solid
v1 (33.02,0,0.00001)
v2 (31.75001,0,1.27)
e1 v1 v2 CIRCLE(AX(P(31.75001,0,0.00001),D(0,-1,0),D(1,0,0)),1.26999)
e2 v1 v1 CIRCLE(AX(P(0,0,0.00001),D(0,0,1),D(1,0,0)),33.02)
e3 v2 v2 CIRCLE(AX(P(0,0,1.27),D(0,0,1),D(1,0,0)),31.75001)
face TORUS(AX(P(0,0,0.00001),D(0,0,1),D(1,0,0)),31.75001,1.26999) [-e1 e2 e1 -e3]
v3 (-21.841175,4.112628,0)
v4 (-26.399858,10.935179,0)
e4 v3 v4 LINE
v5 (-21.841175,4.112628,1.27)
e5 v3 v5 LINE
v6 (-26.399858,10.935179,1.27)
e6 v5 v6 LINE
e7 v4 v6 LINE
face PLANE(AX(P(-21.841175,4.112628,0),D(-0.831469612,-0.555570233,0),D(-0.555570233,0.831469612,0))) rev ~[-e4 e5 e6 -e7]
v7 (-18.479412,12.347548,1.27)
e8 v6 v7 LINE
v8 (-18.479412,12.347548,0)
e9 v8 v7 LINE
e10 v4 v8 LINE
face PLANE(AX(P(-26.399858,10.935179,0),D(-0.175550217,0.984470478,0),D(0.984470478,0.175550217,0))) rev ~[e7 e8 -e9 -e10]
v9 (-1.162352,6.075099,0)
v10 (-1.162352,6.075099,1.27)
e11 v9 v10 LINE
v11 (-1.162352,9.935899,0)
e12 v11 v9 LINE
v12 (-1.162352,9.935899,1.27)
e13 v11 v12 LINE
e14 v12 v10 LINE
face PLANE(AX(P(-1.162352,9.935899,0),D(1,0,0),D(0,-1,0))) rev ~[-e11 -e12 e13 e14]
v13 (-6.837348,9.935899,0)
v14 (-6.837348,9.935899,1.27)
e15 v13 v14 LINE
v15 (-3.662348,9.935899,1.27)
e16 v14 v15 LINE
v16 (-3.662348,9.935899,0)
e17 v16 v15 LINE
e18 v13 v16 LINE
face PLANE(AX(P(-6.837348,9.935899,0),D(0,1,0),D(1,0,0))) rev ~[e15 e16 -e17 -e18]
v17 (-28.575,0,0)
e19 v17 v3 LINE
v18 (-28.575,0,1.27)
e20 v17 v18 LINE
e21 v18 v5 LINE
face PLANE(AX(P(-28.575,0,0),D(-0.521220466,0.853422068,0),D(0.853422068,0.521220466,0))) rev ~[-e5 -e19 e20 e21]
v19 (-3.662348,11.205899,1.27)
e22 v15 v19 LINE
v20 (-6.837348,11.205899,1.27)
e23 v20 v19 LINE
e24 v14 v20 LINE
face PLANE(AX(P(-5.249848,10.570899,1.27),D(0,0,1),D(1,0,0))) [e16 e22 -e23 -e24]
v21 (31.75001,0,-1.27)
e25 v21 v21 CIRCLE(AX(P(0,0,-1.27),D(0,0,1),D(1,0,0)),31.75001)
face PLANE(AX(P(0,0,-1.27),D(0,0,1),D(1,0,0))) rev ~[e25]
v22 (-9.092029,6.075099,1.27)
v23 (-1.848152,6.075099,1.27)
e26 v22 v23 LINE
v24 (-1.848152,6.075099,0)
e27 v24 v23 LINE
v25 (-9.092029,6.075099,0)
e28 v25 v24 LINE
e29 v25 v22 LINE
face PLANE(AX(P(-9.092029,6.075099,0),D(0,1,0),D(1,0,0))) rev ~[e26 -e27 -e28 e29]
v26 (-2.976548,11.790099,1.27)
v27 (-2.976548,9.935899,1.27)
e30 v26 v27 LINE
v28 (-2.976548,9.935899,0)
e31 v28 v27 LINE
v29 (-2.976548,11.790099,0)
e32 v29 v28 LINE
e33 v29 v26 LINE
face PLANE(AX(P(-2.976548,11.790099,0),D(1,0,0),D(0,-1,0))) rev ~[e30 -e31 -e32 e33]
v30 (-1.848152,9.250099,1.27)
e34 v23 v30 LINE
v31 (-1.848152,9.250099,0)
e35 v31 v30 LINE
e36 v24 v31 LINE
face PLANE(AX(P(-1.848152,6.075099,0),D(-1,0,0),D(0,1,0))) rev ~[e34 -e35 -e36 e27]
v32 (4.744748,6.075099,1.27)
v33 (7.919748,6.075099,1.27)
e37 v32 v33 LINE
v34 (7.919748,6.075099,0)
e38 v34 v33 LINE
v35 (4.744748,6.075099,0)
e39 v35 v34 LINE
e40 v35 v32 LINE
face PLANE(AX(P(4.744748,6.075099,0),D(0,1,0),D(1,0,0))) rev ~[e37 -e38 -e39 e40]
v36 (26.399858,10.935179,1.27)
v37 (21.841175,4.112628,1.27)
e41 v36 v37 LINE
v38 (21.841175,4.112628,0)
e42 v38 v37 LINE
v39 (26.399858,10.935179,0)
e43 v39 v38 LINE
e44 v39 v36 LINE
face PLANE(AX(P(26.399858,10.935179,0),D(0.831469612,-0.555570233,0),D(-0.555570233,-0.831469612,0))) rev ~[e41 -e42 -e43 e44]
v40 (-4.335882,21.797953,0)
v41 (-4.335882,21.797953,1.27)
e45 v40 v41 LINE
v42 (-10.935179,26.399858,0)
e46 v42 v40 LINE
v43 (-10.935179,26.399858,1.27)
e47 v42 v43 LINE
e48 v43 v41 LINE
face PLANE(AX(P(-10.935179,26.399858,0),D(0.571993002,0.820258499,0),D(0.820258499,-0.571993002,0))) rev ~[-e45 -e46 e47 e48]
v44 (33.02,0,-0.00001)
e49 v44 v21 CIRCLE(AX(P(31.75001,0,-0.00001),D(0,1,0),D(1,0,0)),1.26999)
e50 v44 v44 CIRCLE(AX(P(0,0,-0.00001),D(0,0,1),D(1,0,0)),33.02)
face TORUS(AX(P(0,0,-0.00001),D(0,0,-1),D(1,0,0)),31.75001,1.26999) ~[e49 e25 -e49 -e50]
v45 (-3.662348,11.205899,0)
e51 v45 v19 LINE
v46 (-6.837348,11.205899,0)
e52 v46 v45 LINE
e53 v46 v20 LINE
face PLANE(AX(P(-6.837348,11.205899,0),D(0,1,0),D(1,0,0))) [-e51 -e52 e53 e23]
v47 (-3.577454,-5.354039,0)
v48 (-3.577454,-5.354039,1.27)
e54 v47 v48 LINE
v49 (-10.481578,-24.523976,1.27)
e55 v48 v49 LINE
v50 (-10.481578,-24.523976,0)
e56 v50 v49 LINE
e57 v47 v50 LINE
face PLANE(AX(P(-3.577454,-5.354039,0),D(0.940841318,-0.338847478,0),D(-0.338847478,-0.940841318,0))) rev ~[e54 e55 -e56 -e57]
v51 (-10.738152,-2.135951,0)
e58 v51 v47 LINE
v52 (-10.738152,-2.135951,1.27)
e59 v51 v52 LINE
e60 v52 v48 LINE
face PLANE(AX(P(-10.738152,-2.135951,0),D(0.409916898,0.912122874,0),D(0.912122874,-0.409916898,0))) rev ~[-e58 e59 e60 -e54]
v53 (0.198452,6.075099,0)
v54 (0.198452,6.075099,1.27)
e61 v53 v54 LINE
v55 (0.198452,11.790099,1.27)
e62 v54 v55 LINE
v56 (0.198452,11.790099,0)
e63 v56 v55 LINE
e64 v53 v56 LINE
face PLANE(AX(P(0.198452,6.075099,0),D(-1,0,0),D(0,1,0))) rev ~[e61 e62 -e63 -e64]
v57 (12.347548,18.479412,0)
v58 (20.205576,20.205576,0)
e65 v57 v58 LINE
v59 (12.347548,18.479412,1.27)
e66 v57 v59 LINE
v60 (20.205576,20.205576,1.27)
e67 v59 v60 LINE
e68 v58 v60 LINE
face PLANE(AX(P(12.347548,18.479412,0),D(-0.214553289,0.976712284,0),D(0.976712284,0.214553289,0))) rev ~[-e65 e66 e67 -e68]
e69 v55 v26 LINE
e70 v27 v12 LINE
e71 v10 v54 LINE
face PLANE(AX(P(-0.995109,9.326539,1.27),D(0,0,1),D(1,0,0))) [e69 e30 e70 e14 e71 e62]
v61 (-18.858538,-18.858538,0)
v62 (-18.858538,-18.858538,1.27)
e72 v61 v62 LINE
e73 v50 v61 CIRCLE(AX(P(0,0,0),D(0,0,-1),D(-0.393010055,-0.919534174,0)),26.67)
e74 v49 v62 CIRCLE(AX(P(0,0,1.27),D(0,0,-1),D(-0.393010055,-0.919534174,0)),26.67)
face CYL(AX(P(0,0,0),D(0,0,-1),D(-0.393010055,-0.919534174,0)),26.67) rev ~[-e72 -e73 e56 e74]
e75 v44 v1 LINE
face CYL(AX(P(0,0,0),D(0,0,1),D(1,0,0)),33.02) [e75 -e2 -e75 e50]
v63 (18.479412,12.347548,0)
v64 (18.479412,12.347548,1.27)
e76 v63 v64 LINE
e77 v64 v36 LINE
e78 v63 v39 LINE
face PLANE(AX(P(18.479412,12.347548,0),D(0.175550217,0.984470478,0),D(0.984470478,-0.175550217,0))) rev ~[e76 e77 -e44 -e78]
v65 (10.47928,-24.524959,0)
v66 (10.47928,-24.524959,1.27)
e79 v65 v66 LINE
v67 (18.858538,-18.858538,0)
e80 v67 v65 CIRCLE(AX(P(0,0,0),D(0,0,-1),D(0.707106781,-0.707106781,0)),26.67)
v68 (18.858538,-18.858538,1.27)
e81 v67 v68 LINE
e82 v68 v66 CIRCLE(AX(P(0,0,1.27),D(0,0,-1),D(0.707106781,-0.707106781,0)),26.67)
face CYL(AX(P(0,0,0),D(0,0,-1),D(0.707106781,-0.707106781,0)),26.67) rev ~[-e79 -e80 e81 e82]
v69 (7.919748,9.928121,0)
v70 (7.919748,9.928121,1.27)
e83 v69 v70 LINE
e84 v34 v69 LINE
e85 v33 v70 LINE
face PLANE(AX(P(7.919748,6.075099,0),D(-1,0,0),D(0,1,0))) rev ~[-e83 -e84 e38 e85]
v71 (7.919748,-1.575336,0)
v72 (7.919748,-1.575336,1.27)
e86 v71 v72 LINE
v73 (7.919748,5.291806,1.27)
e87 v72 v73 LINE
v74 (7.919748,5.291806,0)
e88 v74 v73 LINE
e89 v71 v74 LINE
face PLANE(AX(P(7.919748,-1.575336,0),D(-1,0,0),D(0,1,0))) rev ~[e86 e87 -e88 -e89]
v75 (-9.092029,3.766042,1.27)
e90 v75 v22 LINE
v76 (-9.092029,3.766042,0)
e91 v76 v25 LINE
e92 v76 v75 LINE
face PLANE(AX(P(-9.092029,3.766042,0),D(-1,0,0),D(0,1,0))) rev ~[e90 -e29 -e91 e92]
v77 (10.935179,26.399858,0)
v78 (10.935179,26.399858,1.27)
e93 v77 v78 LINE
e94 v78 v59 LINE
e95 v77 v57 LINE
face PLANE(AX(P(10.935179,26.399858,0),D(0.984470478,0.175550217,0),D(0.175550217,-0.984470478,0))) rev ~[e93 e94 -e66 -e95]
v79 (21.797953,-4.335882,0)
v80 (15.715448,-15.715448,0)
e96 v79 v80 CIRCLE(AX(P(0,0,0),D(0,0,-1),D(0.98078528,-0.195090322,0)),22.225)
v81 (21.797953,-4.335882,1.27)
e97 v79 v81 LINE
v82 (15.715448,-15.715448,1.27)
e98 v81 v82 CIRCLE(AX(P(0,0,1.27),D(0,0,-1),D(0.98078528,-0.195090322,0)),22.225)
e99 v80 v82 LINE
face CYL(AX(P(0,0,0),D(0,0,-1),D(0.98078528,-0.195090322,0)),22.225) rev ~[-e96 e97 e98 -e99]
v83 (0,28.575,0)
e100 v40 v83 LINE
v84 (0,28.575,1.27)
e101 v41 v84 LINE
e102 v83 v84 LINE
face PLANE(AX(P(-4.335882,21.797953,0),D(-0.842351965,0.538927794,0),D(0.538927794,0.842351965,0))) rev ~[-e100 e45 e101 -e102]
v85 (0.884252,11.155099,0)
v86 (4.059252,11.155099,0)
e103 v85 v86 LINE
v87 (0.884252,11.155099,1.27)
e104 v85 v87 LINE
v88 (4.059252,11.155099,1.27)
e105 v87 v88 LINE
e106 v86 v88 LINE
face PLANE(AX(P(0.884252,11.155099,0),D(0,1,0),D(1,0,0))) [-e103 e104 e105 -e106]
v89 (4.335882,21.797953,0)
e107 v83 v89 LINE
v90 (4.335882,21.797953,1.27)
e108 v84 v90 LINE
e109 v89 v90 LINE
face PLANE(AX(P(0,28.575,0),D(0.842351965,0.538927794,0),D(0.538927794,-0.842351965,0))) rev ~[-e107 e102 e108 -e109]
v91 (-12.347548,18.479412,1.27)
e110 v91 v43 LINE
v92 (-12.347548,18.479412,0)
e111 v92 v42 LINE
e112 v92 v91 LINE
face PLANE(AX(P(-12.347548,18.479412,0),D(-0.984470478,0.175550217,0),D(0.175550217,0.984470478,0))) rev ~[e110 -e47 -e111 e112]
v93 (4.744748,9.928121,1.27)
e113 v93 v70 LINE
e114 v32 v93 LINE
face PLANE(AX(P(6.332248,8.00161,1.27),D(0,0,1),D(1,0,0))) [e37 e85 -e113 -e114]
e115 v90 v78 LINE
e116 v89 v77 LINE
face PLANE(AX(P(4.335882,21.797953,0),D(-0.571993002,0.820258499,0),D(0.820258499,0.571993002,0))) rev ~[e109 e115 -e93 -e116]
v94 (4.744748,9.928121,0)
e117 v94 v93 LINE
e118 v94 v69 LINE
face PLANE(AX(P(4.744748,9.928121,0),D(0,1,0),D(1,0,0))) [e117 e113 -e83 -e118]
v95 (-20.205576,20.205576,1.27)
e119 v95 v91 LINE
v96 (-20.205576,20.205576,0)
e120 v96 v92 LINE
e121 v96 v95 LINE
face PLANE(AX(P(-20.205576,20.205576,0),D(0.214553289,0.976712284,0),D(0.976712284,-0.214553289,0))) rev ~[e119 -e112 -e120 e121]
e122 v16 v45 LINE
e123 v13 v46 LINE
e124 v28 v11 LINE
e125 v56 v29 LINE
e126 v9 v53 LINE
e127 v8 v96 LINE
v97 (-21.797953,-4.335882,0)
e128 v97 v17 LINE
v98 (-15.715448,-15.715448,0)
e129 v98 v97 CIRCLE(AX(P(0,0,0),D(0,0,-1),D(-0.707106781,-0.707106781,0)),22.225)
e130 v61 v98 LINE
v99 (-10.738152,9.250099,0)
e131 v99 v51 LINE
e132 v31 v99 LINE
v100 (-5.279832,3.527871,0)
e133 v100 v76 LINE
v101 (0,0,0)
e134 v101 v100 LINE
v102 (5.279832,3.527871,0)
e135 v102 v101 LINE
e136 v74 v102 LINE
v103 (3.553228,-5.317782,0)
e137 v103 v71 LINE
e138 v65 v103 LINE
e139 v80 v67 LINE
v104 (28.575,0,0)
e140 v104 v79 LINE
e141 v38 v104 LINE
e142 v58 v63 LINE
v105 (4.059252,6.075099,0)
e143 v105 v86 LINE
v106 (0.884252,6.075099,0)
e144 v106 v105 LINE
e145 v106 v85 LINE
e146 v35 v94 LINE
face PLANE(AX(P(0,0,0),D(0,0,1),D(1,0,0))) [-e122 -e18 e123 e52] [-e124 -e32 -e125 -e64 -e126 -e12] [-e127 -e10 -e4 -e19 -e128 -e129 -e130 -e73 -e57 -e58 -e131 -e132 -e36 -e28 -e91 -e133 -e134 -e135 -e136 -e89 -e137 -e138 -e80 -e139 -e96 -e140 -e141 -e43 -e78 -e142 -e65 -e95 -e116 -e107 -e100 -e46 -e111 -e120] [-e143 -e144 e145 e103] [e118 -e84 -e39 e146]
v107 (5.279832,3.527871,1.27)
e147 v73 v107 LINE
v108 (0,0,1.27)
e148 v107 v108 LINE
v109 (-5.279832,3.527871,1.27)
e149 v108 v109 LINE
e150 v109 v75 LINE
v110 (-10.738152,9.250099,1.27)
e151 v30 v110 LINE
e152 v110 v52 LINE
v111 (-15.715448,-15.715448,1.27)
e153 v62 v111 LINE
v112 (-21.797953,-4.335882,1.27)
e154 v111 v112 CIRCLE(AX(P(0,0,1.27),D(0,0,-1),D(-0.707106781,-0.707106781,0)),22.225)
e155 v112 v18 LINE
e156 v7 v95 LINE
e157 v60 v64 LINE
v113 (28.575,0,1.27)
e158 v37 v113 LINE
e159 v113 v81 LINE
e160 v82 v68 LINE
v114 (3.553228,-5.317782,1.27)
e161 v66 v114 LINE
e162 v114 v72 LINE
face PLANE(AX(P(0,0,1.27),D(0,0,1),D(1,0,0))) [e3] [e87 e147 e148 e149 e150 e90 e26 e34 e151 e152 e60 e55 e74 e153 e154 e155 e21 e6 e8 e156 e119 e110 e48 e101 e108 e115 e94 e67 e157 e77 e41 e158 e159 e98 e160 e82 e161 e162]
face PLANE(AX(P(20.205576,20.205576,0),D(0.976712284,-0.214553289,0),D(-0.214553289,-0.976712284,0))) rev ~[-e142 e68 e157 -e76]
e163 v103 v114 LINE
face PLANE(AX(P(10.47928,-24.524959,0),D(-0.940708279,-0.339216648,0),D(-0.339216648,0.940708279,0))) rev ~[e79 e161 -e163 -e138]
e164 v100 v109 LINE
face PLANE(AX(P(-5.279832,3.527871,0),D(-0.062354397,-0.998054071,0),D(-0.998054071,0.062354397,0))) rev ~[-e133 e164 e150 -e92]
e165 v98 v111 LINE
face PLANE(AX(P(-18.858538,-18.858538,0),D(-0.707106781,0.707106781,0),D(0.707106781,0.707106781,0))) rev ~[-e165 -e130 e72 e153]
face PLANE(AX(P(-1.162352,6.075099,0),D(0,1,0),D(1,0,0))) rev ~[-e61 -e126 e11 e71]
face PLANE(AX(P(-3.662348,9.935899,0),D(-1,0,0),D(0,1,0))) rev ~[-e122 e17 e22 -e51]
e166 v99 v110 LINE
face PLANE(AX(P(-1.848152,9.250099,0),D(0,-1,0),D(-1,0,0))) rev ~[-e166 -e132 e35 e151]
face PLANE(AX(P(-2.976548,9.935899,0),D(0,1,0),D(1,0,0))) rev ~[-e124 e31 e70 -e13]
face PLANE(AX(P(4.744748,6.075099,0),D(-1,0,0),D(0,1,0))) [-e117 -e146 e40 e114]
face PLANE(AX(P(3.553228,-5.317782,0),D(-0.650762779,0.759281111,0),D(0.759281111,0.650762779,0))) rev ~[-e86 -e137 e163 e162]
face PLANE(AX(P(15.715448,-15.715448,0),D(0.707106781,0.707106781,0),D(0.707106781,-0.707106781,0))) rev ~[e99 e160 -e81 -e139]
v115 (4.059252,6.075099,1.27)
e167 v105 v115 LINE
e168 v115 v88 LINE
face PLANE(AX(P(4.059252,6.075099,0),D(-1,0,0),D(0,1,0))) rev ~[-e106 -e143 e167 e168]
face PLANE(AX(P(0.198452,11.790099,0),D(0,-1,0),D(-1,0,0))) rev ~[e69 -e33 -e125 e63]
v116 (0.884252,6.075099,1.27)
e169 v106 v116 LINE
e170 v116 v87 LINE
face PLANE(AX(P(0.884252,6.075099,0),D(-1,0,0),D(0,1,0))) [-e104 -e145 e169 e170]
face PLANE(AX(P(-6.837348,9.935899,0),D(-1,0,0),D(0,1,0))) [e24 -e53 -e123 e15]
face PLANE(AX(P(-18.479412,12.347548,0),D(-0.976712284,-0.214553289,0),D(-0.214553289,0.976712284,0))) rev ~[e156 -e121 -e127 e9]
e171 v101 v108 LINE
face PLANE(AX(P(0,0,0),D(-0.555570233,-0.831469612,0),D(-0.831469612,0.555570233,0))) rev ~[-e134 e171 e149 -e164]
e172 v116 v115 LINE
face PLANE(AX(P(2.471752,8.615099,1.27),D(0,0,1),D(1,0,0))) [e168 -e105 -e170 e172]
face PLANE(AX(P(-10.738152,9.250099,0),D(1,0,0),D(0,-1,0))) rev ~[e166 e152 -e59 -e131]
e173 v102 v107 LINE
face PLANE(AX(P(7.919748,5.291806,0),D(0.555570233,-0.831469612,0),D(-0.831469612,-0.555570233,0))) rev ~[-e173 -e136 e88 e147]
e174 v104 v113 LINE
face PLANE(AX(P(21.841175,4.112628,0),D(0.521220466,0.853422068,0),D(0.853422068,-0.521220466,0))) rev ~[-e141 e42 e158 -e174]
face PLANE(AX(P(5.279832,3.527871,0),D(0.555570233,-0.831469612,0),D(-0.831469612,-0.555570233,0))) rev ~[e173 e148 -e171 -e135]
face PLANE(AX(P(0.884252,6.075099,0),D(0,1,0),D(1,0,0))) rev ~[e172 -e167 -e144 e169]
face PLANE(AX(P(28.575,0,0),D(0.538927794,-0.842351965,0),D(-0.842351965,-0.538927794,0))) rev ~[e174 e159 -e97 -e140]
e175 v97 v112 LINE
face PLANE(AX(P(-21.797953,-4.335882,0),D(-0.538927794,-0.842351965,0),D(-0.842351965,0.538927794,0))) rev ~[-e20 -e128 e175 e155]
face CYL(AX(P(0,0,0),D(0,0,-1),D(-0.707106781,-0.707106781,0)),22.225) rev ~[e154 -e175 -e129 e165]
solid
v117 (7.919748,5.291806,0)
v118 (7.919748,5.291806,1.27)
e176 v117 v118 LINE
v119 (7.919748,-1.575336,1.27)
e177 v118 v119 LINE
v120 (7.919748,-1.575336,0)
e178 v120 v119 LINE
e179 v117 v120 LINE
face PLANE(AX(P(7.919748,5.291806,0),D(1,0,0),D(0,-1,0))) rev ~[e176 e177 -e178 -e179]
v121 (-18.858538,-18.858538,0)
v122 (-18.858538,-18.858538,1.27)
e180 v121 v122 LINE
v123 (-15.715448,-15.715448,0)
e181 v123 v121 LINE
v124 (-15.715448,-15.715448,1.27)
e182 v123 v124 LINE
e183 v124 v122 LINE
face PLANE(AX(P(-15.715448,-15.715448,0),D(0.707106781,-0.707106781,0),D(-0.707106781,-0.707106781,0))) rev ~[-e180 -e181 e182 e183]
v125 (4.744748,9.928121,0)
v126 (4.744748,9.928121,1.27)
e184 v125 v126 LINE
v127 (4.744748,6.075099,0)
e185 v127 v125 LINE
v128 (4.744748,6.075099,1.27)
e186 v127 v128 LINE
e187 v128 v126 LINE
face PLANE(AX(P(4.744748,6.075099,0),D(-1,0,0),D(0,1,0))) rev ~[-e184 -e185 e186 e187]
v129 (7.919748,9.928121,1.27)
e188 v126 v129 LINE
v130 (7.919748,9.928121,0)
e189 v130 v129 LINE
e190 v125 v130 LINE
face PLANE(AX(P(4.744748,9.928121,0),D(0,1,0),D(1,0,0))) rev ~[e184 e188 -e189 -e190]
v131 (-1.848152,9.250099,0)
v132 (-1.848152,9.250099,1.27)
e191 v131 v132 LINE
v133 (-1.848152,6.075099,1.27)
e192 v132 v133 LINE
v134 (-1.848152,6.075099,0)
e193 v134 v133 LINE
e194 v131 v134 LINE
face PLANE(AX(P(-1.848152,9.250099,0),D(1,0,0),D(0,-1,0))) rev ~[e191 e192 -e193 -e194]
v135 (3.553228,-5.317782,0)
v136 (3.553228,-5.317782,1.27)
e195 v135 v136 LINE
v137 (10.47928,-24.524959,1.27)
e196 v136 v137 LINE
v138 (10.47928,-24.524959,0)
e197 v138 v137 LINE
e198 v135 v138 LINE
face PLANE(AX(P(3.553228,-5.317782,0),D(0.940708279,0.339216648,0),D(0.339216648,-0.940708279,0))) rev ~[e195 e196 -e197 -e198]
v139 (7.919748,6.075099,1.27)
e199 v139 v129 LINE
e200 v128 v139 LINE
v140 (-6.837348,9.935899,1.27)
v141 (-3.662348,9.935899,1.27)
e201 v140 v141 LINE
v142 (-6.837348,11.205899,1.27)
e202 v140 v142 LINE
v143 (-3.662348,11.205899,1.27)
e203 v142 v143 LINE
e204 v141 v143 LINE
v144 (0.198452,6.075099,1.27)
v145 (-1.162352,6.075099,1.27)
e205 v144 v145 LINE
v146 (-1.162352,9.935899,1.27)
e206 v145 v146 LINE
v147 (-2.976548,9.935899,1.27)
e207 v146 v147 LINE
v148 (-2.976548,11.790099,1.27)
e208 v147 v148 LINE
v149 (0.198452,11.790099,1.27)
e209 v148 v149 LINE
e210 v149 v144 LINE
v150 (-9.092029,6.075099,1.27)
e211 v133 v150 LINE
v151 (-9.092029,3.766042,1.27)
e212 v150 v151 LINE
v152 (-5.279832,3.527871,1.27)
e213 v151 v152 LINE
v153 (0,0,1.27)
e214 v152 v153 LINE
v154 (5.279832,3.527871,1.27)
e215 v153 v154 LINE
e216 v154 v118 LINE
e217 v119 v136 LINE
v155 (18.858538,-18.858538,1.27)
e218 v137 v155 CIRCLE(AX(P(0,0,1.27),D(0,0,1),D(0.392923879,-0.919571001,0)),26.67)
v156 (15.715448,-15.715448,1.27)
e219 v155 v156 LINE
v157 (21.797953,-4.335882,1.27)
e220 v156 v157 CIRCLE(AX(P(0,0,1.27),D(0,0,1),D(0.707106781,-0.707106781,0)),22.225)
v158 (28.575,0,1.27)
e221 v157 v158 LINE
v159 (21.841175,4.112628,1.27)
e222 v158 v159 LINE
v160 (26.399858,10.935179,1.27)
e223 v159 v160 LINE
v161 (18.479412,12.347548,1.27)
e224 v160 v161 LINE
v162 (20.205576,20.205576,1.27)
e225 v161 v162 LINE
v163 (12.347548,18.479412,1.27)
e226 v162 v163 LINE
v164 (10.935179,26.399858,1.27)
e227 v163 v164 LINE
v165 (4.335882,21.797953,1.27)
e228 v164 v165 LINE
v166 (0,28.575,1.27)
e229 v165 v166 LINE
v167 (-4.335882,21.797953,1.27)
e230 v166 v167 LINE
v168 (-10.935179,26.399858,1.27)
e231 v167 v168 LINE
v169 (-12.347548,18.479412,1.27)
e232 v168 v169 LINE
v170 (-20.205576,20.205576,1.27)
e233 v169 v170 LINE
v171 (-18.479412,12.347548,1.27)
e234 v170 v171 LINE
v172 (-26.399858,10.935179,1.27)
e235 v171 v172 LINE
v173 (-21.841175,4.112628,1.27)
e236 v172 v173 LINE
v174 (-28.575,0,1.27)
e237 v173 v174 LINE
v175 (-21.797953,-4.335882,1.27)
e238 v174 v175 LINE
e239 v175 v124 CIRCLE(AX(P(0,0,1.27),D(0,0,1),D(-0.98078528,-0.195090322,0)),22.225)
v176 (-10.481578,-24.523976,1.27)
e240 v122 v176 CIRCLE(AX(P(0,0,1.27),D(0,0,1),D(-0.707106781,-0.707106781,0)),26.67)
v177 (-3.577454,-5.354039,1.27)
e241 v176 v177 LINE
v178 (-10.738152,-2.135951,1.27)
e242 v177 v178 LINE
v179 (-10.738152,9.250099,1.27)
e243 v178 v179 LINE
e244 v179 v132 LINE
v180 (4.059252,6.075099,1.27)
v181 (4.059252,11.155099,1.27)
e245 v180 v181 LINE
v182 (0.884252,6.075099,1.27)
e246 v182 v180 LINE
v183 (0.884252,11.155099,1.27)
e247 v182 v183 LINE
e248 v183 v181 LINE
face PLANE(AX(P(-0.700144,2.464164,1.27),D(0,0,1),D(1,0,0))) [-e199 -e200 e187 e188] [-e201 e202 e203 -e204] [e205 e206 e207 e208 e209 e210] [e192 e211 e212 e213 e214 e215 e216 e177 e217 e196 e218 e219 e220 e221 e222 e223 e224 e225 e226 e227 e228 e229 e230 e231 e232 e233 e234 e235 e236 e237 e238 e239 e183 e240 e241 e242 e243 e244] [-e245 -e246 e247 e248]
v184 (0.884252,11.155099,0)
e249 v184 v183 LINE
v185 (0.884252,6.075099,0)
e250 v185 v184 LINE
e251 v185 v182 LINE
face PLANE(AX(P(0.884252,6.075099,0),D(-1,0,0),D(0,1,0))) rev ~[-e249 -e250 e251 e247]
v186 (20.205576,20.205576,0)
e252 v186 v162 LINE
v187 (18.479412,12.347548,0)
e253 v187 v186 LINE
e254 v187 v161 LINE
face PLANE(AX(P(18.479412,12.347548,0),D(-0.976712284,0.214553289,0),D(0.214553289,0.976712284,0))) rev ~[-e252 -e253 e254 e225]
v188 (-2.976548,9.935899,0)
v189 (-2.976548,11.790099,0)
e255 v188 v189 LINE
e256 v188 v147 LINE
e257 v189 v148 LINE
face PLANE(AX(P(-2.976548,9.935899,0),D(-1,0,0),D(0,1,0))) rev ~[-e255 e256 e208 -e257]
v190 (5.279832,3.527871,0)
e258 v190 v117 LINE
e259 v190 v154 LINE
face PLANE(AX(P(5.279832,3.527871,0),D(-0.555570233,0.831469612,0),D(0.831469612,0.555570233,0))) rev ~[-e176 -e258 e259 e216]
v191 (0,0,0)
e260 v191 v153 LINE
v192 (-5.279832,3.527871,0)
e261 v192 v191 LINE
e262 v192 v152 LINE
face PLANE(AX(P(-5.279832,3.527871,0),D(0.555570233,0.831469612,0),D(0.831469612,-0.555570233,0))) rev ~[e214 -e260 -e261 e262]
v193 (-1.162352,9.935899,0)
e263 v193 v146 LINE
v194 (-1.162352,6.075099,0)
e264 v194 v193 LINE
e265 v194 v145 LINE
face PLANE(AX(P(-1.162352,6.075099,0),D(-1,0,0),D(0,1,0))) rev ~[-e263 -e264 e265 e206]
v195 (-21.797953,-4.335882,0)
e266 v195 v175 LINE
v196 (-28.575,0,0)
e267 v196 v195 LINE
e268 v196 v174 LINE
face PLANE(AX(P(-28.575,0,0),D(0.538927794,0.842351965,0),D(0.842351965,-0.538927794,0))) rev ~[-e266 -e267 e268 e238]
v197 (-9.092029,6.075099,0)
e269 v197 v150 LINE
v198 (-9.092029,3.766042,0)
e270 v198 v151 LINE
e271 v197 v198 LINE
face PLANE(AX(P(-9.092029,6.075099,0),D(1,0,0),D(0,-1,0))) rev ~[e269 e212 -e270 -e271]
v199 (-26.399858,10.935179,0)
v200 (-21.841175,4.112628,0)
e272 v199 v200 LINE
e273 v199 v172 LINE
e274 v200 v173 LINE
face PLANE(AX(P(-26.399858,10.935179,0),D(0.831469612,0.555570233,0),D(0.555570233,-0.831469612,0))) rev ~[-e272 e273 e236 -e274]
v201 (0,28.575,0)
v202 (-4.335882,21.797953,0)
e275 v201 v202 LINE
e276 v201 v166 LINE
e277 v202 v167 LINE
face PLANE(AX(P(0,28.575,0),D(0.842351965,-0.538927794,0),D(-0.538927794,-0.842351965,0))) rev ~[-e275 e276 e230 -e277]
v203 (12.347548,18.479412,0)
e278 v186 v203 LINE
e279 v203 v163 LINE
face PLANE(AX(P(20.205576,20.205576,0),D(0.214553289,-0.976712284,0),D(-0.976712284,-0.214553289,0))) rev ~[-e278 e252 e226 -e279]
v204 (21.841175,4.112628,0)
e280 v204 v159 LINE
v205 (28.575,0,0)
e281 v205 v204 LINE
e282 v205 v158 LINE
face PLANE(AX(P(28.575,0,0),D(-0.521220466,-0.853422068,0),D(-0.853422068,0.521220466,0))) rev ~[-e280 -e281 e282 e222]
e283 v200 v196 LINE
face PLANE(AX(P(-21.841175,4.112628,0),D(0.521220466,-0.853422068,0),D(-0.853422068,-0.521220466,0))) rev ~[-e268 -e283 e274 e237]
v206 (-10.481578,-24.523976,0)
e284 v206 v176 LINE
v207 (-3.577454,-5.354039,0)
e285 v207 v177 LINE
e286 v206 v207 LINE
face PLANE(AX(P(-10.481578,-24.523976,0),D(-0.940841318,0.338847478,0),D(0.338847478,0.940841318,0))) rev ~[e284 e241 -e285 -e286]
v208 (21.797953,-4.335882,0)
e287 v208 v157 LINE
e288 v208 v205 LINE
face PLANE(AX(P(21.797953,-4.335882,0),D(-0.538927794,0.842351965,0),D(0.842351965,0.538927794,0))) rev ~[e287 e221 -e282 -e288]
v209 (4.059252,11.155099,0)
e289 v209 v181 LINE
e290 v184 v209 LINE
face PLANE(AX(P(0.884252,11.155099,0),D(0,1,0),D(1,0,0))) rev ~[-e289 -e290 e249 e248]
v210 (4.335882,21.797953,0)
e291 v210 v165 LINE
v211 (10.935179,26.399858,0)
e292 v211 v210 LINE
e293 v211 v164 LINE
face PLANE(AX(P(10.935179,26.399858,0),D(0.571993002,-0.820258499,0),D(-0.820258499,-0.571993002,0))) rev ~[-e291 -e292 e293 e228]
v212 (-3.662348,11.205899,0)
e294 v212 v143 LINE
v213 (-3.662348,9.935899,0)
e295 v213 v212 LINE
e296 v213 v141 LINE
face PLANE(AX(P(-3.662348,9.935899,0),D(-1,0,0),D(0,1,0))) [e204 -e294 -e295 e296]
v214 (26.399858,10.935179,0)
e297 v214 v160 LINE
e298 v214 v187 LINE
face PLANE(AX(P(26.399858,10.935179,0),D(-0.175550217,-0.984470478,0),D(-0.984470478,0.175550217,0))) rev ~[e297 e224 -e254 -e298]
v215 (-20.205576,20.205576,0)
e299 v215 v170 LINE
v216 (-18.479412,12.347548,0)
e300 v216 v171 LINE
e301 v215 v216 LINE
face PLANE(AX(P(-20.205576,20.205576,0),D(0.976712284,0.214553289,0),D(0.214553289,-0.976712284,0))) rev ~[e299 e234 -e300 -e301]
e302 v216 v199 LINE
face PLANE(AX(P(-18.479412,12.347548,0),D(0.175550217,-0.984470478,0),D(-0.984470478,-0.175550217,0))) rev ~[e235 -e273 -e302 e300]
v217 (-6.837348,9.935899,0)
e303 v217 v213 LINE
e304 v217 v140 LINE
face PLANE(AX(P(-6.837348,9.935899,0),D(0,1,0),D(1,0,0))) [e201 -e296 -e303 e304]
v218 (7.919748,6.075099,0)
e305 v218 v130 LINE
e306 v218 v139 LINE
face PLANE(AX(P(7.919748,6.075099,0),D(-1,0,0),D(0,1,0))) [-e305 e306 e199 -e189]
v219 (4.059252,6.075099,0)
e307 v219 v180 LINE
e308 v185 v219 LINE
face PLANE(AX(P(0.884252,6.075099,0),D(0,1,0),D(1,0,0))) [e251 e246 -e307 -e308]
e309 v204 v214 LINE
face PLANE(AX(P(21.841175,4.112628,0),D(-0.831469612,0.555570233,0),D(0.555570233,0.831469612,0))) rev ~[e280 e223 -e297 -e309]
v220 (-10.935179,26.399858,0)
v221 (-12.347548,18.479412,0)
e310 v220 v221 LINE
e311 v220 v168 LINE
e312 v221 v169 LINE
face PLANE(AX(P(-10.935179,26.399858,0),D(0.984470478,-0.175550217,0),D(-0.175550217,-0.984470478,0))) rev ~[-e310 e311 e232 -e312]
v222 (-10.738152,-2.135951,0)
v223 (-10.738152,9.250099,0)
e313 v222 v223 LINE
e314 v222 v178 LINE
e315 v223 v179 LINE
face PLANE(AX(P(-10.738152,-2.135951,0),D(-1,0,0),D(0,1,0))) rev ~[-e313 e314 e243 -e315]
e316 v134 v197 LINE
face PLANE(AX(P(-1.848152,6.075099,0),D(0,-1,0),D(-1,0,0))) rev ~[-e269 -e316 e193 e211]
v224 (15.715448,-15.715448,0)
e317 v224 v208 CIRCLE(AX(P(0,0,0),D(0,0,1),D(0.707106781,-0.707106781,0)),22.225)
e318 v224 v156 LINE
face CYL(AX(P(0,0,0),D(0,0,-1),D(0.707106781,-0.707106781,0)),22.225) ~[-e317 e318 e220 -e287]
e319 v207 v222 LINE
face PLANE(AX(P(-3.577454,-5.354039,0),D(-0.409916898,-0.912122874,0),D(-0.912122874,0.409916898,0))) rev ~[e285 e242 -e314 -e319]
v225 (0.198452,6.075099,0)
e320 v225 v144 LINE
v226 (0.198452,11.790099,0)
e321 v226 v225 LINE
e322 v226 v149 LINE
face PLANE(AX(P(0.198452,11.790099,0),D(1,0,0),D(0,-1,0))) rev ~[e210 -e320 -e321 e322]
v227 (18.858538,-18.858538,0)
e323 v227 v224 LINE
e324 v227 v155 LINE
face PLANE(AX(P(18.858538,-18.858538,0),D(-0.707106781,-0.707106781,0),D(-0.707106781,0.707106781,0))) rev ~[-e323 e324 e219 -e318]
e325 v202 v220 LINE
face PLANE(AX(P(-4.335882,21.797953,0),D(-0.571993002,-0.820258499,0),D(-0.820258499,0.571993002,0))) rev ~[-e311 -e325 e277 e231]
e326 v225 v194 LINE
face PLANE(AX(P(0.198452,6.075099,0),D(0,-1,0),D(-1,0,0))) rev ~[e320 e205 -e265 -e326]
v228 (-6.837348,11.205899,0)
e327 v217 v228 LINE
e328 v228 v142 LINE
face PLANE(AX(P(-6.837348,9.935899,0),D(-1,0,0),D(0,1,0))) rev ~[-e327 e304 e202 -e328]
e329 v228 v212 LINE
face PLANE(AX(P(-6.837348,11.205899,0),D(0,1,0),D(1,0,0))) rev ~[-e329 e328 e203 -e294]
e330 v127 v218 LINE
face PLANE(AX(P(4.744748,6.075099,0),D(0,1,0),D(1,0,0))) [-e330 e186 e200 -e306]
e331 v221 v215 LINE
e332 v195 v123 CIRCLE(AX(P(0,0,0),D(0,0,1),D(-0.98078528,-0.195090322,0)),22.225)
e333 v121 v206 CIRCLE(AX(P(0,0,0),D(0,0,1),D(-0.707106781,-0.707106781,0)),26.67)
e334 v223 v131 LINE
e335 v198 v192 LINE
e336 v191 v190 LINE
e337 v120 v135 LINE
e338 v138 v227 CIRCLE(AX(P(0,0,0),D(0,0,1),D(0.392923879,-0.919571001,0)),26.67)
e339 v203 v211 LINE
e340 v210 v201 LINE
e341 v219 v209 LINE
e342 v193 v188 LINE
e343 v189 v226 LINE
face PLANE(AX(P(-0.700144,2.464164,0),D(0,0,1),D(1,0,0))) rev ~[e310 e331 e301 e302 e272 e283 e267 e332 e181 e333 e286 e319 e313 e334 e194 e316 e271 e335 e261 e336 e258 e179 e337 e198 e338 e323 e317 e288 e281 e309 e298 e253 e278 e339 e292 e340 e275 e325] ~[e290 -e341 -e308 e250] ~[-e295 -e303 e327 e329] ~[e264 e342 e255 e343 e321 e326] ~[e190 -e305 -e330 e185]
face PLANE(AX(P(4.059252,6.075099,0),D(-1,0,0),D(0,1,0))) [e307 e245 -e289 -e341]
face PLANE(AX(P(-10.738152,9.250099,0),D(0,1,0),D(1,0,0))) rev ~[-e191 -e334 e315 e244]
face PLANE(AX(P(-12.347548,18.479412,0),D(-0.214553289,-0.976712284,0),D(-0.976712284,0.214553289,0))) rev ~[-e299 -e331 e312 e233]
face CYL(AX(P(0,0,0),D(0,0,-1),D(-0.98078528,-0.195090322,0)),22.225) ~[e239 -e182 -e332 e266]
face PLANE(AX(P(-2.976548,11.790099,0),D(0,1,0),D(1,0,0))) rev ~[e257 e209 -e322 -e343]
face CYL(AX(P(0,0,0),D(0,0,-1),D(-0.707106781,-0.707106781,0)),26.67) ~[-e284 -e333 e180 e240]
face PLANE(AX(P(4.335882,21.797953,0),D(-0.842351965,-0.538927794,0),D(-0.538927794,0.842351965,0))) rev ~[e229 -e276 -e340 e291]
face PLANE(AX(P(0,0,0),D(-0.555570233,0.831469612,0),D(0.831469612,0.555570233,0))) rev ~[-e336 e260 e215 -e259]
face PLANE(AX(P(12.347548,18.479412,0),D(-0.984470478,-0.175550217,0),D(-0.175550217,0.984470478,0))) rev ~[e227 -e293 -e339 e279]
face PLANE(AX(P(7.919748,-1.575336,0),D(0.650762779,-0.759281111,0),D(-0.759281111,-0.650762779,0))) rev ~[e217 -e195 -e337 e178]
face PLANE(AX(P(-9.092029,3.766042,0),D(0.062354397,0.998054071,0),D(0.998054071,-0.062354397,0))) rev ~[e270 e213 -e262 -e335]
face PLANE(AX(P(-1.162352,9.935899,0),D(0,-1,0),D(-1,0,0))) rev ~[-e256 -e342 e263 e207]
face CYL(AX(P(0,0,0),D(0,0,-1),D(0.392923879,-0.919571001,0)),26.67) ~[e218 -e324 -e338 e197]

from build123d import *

# Parameters (mm, degrees)
F0_R     = 33.02
F1_DEPTH = 1.27
F0_W     = 3.175
F0_H     = 3.8530217187
F0_H_2   = 5.08
F0_H_3   = 1.27
F2_DEPTH = 1.27
F3_DEPTH = 1.27
F4_R     = 1.26999


# Not quite as in the source:
# - a fillet or chamfer is up to 0.001 mm smaller than in the source, because OpenCascade refuses the exact size


with BuildPart() as f1:
    # F0 (on Top) → F1 (new body)
    with BuildSketch(Plane.XY):
        Circle(F0_R)
        with BuildLine():
            Line((-2.9765482984, 6.0750994888), (-1.8481521045, 6.0750994888))
            Line((-1.8481521045, 6.0750994888), (-1.8481521045, 9.2500994888))
            Line((-1.8481521045, 9.2500994888), (-10.7381521045, 9.2500994888))
            Line((-10.7381521045, 9.2500994888), (-10.7381521045, 2.1359512564))
            Line((-10.7381521045, 2.1359512564), (-10.7381521045, 0))
            Line((-10.7381521045, 0), (-10.7381521045, -2.1359512564))
            Line((-10.7381521045, -2.1359512564), (-3.5774542134, -5.3540385915))
            Line((-3.5774542134, -5.3540385915), (-10.4815781743, -24.5239764104))
            ThreePointArc((-10.4815781743, -24.5239764104), (-14.9410475085, -22.0919442184), (-18.8585378542, -18.8585378542))
            Line((-18.8585378542, -18.8585378542), (-15.7154482119, -15.7154482119))
            ThreePointArc((-15.7154482119, -15.7154482119), (-19.6007001001, -10.476792476), (-21.797952857, -4.3358824068))
            Line((-21.797952857, -4.3358824068), (-28.575, 0))
            Line((-28.575, 0), (-21.8411747772, 4.1126280349))
            Line((-21.8411747772, 4.1126280349), (-26.3998576415, 10.9351790798))
            Line((-26.3998576415, 10.9351790798), (-18.4794121334, 12.3475484289))
            Line((-18.4794121334, 12.3475484289), (-20.2055762724, 20.2055762724))
            Line((-20.2055762724, 20.2055762724), (-12.3475484289, 18.4794121334))
            Line((-12.3475484289, 18.4794121334), (-10.9351790798, 26.3998576415))
            Line((-10.9351790798, 26.3998576415), (-4.3358824068, 21.797952857))
            Line((-4.3358824068, 21.797952857), (0, 28.575))
            Line((0, 28.575), (4.3358824068, 21.797952857))
            Line((4.3358824068, 21.797952857), (10.9351790798, 26.3998576415))
            Line((10.9351790798, 26.3998576415), (12.3475484289, 18.4794121334))
            Line((12.3475484289, 18.4794121334), (20.2055762724, 20.2055762724))
            Line((20.2055762724, 20.2055762724), (18.4794121334, 12.3475484289))
            Line((18.4794121334, 12.3475484289), (26.3998576415, 10.9351790798))
            Line((26.3998576415, 10.9351790798), (21.8411747772, 4.1126280349))
            Line((21.8411747772, 4.1126280349), (28.575, 0))
            Line((28.575, 0), (21.797952857, -4.3358824068))
            ThreePointArc((21.797952857, -4.3358824068), (19.6007001001, -10.476792476), (15.7154482119, -15.7154482119))
            Line((15.7154482119, -15.7154482119), (18.8585378542, -18.8585378542))
            ThreePointArc((18.8585378542, -18.8585378542), (14.9400123163, -22.092644296), (10.4792798584, -24.5249585861))
            Line((10.4792798584, -24.5249585861), (3.5532282388, -5.3177818583))
            Line((3.5532282388, -5.3177818583), (7.9197480572, -1.5753358351))
            Line((7.9197480572, -1.5753358351), (7.9197480572, 0))
            Line((7.9197480572, 0), (7.9197480572, 1.5753358351))
            Line((7.9197480572, 1.5753358351), (7.9197480572, 5.2918064695))
            Line((7.9197480572, 5.2918064695), (5.2798320381, 3.5278709797))
            Line((5.2798320381, 3.5278709797), (0, 0))
            Line((0, 0), (-5.2798320381, 3.5278709797))
            Line((-5.2798320381, 3.5278709797), (-9.0920289037, 3.7660416814))
            Line((-9.0920289037, 3.7660416814), (-9.0920289037, 6.0750994888))
            Line((-9.0920289037, 6.0750994888), (-3.6623482984, 6.0750994888))
            Line((-3.6623482984, 6.0750994888), (-2.9765482984, 6.0750994888))
        make_face(mode=Mode.SUBTRACT)
    extrude(amount=F1_DEPTH)



with BuildPart() as f1b:
    # F0 (on Top) → F1, piece 2 (new body)
    with BuildSketch(Plane.XY):
        with Locations((6.3322480572, 8.0016103481)):
            Rectangle(F0_W, F0_H)
    extrude(amount=F1_DEPTH)


with BuildPart() as f1c:
    # F0 (on Top) → F1, piece 3 (new body)
    with BuildSketch(Plane.XY):
        with Locations((2.4717517016, 8.6150994888)):
            Rectangle(F0_W, F0_H_2)
    extrude(amount=F1_DEPTH)


with BuildPart() as f1d:
    # F0 (on Top) → F1, piece 4 (new body)
    with BuildSketch(Plane.XY):
        Polygon((-1.1623521045, 6.0750994888), (0.1984517016, 6.0750994888), (0.1984517016, 11.7900994888), (-2.9765482984, 11.7900994888), (-2.9765482984, 9.9358994888), (-1.1623521045, 9.9358994888), align=None)
    extrude(amount=F1_DEPTH)


with BuildPart() as f1e:
    # F0 (on Top) → F1, piece 5 (new body)
    with BuildSketch(Plane.XY):
        with Locations((-5.2498482984, 10.5708994888)):
            Rectangle(F0_W, F0_H_3)
    extrude(amount=F1_DEPTH)


with BuildPart() as f2:
    # F0 (on Top) → F2 (new body)
    with BuildSketch(Plane.XY):
        with BuildLine():
            Line((-1.8481521045, 9.2500994888), (-1.8481521045, 6.0750994888))
            Line((-1.8481521045, 6.0750994888), (-2.9765482984, 6.0750994888))
            Line((-2.9765482984, 6.0750994888), (-3.6623482984, 6.0750994888))
            Line((-3.6623482984, 6.0750994888), (-9.0920289037, 6.0750994888))
            Line((-9.0920289037, 6.0750994888), (-9.0920289037, 3.7660416814))
            Line((-9.0920289037, 3.7660416814), (-5.2798320381, 3.5278709797))
            Line((-5.2798320381, 3.5278709797), (0, 0))
            Line((0, 0), (5.2798320381, 3.5278709797))
            Line((5.2798320381, 3.5278709797), (7.9197480572, 5.2918064695))
            Line((7.9197480572, 5.2918064695), (7.9197480572, 1.5753358351))
            Line((7.9197480572, 1.5753358351), (7.9197480572, 0))
            Line((7.9197480572, 0), (7.9197480572, -1.5753358351))
            Line((7.9197480572, -1.5753358351), (3.5532282388, -5.3177818583))
            Line((3.5532282388, -5.3177818583), (10.4792798584, -24.5249585861))
            ThreePointArc((10.4792798584, -24.5249585861), (14.9400123163, -22.092644296), (18.8585378542, -18.8585378542))
            Line((18.8585378542, -18.8585378542), (15.7154482119, -15.7154482119))
            ThreePointArc((15.7154482119, -15.7154482119), (19.6007001001, -10.476792476), (21.797952857, -4.3358824068))
            Line((21.797952857, -4.3358824068), (28.575, 0))
            Line((28.575, 0), (21.8411747772, 4.1126280349))
            Line((21.8411747772, 4.1126280349), (26.3998576415, 10.9351790798))
            Line((26.3998576415, 10.9351790798), (18.4794121334, 12.3475484289))
            Line((18.4794121334, 12.3475484289), (20.2055762724, 20.2055762724))
            Line((20.2055762724, 20.2055762724), (12.3475484289, 18.4794121334))
            Line((12.3475484289, 18.4794121334), (10.9351790798, 26.3998576415))
            Line((10.9351790798, 26.3998576415), (4.3358824068, 21.797952857))
            Line((4.3358824068, 21.797952857), (0, 28.575))
            Line((0, 28.575), (-4.3358824068, 21.797952857))
            Line((-4.3358824068, 21.797952857), (-10.9351790798, 26.3998576415))
            Line((-10.9351790798, 26.3998576415), (-12.3475484289, 18.4794121334))
            Line((-12.3475484289, 18.4794121334), (-20.2055762724, 20.2055762724))
            Line((-20.2055762724, 20.2055762724), (-18.4794121334, 12.3475484289))
            Line((-18.4794121334, 12.3475484289), (-26.3998576415, 10.9351790798))
            Line((-26.3998576415, 10.9351790798), (-21.8411747772, 4.1126280349))
            Line((-21.8411747772, 4.1126280349), (-28.575, 0))
            Line((-28.575, 0), (-21.797952857, -4.3358824068))
            ThreePointArc((-21.797952857, -4.3358824068), (-19.6007001001, -10.476792476), (-15.7154482119, -15.7154482119))
            Line((-15.7154482119, -15.7154482119), (-18.8585378542, -18.8585378542))
            ThreePointArc((-18.8585378542, -18.8585378542), (-14.9410475085, -22.0919442184), (-10.4815781743, -24.5239764104))
            Line((-10.4815781743, -24.5239764104), (-3.5774542134, -5.3540385915))
            Line((-3.5774542134, -5.3540385915), (-10.7381521045, -2.1359512564))
            Line((-10.7381521045, -2.1359512564), (-10.7381521045, 0))
            Line((-10.7381521045, 0), (-10.7381521045, 2.1359512564))
            Line((-10.7381521045, 2.1359512564), (-10.7381521045, 9.2500994888))
            Line((-10.7381521045, 9.2500994888), (-1.8481521045, 9.2500994888))
        make_face()
        with Locations((-5.2498482984, 10.5708994888)):
            Rectangle(F0_W, F0_H_3, mode=Mode.SUBTRACT)
        Polygon((0.1984517016, 11.7900994888), (0.1984517016, 6.0750994888), (-1.1623521045, 6.0750994888), (-1.1623521045, 9.9358994888), (-2.9765482984, 9.9358994888), (-2.9765482984, 11.7900994888), align=None, mode=Mode.SUBTRACT)
        with Locations((6.3322480572, 8.0016103481)):
            Rectangle(F0_W, F0_H, mode=Mode.SUBTRACT)
        with Locations((2.4717517016, 8.6150994888)):
            Rectangle(F0_W, F0_H_2, mode=Mode.SUBTRACT)
    extrude(amount=F2_DEPTH)


with BuildPart() as f1_1:
    add(f1.part)

    add(f1b.part)  # F3 merges F1b

    add(f1c.part)  # F3 merges F1c

    add(f1d.part)  # F3 merges F1d

    add(f1e.part)  # F3 merges F1e
    # F0 (on Top) → F3 (join)
    with BuildSketch(Plane.XY):
        Circle(F0_R)
        with BuildLine():
            Line((-2.9765482984, 6.0750994888), (-1.8481521045, 6.0750994888))
            Line((-1.8481521045, 6.0750994888), (-1.8481521045, 9.2500994888))
            Line((-1.8481521045, 9.2500994888), (-10.7381521045, 9.2500994888))
            Line((-10.7381521045, 9.2500994888), (-10.7381521045, 2.1359512564))
            Line((-10.7381521045, 2.1359512564), (-10.7381521045, 0))
            Line((-10.7381521045, 0), (-10.7381521045, -2.1359512564))
            Line((-10.7381521045, -2.1359512564), (-3.5774542134, -5.3540385915))
            Line((-3.5774542134, -5.3540385915), (-10.4815781743, -24.5239764104))
            ThreePointArc((-10.4815781743, -24.5239764104), (-14.9410475085, -22.0919442184), (-18.8585378542, -18.8585378542))
            Line((-18.8585378542, -18.8585378542), (-15.7154482119, -15.7154482119))
            ThreePointArc((-15.7154482119, -15.7154482119), (-19.6007001001, -10.476792476), (-21.797952857, -4.3358824068))
            Line((-21.797952857, -4.3358824068), (-28.575, 0))
            Line((-28.575, 0), (-21.8411747772, 4.1126280349))
            Line((-21.8411747772, 4.1126280349), (-26.3998576415, 10.9351790798))
            Line((-26.3998576415, 10.9351790798), (-18.4794121334, 12.3475484289))
            Line((-18.4794121334, 12.3475484289), (-20.2055762724, 20.2055762724))
            Line((-20.2055762724, 20.2055762724), (-12.3475484289, 18.4794121334))
            Line((-12.3475484289, 18.4794121334), (-10.9351790798, 26.3998576415))
            Line((-10.9351790798, 26.3998576415), (-4.3358824068, 21.797952857))
            Line((-4.3358824068, 21.797952857), (0, 28.575))
            Line((0, 28.575), (4.3358824068, 21.797952857))
            Line((4.3358824068, 21.797952857), (10.9351790798, 26.3998576415))
            Line((10.9351790798, 26.3998576415), (12.3475484289, 18.4794121334))
            Line((12.3475484289, 18.4794121334), (20.2055762724, 20.2055762724))
            Line((20.2055762724, 20.2055762724), (18.4794121334, 12.3475484289))
            Line((18.4794121334, 12.3475484289), (26.3998576415, 10.9351790798))
            Line((26.3998576415, 10.9351790798), (21.8411747772, 4.1126280349))
            Line((21.8411747772, 4.1126280349), (28.575, 0))
            Line((28.575, 0), (21.797952857, -4.3358824068))
            ThreePointArc((21.797952857, -4.3358824068), (19.6007001001, -10.476792476), (15.7154482119, -15.7154482119))
            Line((15.7154482119, -15.7154482119), (18.8585378542, -18.8585378542))
            ThreePointArc((18.8585378542, -18.8585378542), (14.9400123163, -22.092644296), (10.4792798584, -24.5249585861))
            Line((10.4792798584, -24.5249585861), (3.5532282388, -5.3177818583))
            Line((3.5532282388, -5.3177818583), (7.9197480572, -1.5753358351))
            Line((7.9197480572, -1.5753358351), (7.9197480572, 0))
            Line((7.9197480572, 0), (7.9197480572, 1.5753358351))
            Line((7.9197480572, 1.5753358351), (7.9197480572, 5.2918064695))
            Line((7.9197480572, 5.2918064695), (5.2798320381, 3.5278709797))
            Line((5.2798320381, 3.5278709797), (0, 0))
            Line((0, 0), (-5.2798320381, 3.5278709797))
            Line((-5.2798320381, 3.5278709797), (-9.0920289037, 3.7660416814))
            Line((-9.0920289037, 3.7660416814), (-9.0920289037, 6.0750994888))
            Line((-9.0920289037, 6.0750994888), (-3.6623482984, 6.0750994888))
            Line((-3.6623482984, 6.0750994888), (-2.9765482984, 6.0750994888))
        make_face(mode=Mode.SUBTRACT)
        with BuildLine():
            Line((-1.8481521045, 9.2500994888), (-1.8481521045, 6.0750994888))
            Line((-1.8481521045, 6.0750994888), (-2.9765482984, 6.0750994888))
            Line((-2.9765482984, 6.0750994888), (-3.6623482984, 6.0750994888))
            Line((-3.6623482984, 6.0750994888), (-9.0920289037, 6.0750994888))
            Line((-9.0920289037, 6.0750994888), (-9.0920289037, 3.7660416814))
            Line((-9.0920289037, 3.7660416814), (-5.2798320381, 3.5278709797))
            Line((-5.2798320381, 3.5278709797), (0, 0))
            Line((0, 0), (5.2798320381, 3.5278709797))
            Line((5.2798320381, 3.5278709797), (7.9197480572, 5.2918064695))
            Line((7.9197480572, 5.2918064695), (7.9197480572, 1.5753358351))
            Line((7.9197480572, 1.5753358351), (7.9197480572, 0))
            Line((7.9197480572, 0), (7.9197480572, -1.5753358351))
            Line((7.9197480572, -1.5753358351), (3.5532282388, -5.3177818583))
            Line((3.5532282388, -5.3177818583), (10.4792798584, -24.5249585861))
            ThreePointArc((10.4792798584, -24.5249585861), (14.9400123163, -22.092644296), (18.8585378542, -18.8585378542))
            Line((18.8585378542, -18.8585378542), (15.7154482119, -15.7154482119))
            ThreePointArc((15.7154482119, -15.7154482119), (19.6007001001, -10.476792476), (21.797952857, -4.3358824068))
            Line((21.797952857, -4.3358824068), (28.575, 0))
            Line((28.575, 0), (21.8411747772, 4.1126280349))
            Line((21.8411747772, 4.1126280349), (26.3998576415, 10.9351790798))
            Line((26.3998576415, 10.9351790798), (18.4794121334, 12.3475484289))
            Line((18.4794121334, 12.3475484289), (20.2055762724, 20.2055762724))
            Line((20.2055762724, 20.2055762724), (12.3475484289, 18.4794121334))
            Line((12.3475484289, 18.4794121334), (10.9351790798, 26.3998576415))
            Line((10.9351790798, 26.3998576415), (4.3358824068, 21.797952857))
            Line((4.3358824068, 21.797952857), (0, 28.575))
            Line((0, 28.575), (-4.3358824068, 21.797952857))
            Line((-4.3358824068, 21.797952857), (-10.9351790798, 26.3998576415))
            Line((-10.9351790798, 26.3998576415), (-12.3475484289, 18.4794121334))
            Line((-12.3475484289, 18.4794121334), (-20.2055762724, 20.2055762724))
            Line((-20.2055762724, 20.2055762724), (-18.4794121334, 12.3475484289))
            Line((-18.4794121334, 12.3475484289), (-26.3998576415, 10.9351790798))
            Line((-26.3998576415, 10.9351790798), (-21.8411747772, 4.1126280349))
            Line((-21.8411747772, 4.1126280349), (-28.575, 0))
            Line((-28.575, 0), (-21.797952857, -4.3358824068))
            ThreePointArc((-21.797952857, -4.3358824068), (-19.6007001001, -10.476792476), (-15.7154482119, -15.7154482119))
            Line((-15.7154482119, -15.7154482119), (-18.8585378542, -18.8585378542))
            ThreePointArc((-18.8585378542, -18.8585378542), (-14.9410475085, -22.0919442184), (-10.4815781743, -24.5239764104))
            Line((-10.4815781743, -24.5239764104), (-3.5774542134, -5.3540385915))
            Line((-3.5774542134, -5.3540385915), (-10.7381521045, -2.1359512564))
            Line((-10.7381521045, -2.1359512564), (-10.7381521045, 0))
            Line((-10.7381521045, 0), (-10.7381521045, 2.1359512564))
            Line((-10.7381521045, 2.1359512564), (-10.7381521045, 9.2500994888))
            Line((-10.7381521045, 9.2500994888), (-1.8481521045, 9.2500994888))
        make_face()
        with Locations((-5.2498482984, 10.5708994888)):
            Rectangle(F0_W, F0_H_3, mode=Mode.SUBTRACT)
        Polygon((0.1984517016, 11.7900994888), (0.1984517016, 6.0750994888), (-1.1623521045, 6.0750994888), (-1.1623521045, 9.9358994888), (-2.9765482984, 9.9358994888), (-2.9765482984, 11.7900994888), align=None, mode=Mode.SUBTRACT)
        with Locations((6.3322480572, 8.0016103481)):
            Rectangle(F0_W, F0_H, mode=Mode.SUBTRACT)
        with Locations((2.4717517016, 8.6150994888)):
            Rectangle(F0_W, F0_H_2, mode=Mode.SUBTRACT)
        with Locations((6.3322480572, 8.0016103481)):
            Rectangle(F0_W, F0_H)
        with Locations((2.4717517016, 8.6150994888)):
            Rectangle(F0_W, F0_H_2)
        Polygon((-1.1623521045, 6.0750994888), (0.1984517016, 6.0750994888), (0.1984517016, 11.7900994888), (-2.9765482984, 11.7900994888), (-2.9765482984, 9.9358994888), (-1.1623521045, 9.9358994888), align=None)
        with Locations((-5.2498482984, 10.5708994888)):
            Rectangle(F0_W, F0_H_3)
    extrude(amount=-F3_DEPTH)

    # F4 (radius 1.27 in the source; OpenCascade refuses exactly that, so slightly less here)
    f4_edges = [f1_1.edges().sort_by_distance(p)[0] for p in [
        (33.02, 0, 0.635),
        (-33.02, 0, 0),
        (-33.02, 0, 1.27),
        (-33.02, 0, -1.27),
    ]]
    fillet(f4_edges, radius=F4_R)


solid = Compound([f2.part, f1_1.part])
